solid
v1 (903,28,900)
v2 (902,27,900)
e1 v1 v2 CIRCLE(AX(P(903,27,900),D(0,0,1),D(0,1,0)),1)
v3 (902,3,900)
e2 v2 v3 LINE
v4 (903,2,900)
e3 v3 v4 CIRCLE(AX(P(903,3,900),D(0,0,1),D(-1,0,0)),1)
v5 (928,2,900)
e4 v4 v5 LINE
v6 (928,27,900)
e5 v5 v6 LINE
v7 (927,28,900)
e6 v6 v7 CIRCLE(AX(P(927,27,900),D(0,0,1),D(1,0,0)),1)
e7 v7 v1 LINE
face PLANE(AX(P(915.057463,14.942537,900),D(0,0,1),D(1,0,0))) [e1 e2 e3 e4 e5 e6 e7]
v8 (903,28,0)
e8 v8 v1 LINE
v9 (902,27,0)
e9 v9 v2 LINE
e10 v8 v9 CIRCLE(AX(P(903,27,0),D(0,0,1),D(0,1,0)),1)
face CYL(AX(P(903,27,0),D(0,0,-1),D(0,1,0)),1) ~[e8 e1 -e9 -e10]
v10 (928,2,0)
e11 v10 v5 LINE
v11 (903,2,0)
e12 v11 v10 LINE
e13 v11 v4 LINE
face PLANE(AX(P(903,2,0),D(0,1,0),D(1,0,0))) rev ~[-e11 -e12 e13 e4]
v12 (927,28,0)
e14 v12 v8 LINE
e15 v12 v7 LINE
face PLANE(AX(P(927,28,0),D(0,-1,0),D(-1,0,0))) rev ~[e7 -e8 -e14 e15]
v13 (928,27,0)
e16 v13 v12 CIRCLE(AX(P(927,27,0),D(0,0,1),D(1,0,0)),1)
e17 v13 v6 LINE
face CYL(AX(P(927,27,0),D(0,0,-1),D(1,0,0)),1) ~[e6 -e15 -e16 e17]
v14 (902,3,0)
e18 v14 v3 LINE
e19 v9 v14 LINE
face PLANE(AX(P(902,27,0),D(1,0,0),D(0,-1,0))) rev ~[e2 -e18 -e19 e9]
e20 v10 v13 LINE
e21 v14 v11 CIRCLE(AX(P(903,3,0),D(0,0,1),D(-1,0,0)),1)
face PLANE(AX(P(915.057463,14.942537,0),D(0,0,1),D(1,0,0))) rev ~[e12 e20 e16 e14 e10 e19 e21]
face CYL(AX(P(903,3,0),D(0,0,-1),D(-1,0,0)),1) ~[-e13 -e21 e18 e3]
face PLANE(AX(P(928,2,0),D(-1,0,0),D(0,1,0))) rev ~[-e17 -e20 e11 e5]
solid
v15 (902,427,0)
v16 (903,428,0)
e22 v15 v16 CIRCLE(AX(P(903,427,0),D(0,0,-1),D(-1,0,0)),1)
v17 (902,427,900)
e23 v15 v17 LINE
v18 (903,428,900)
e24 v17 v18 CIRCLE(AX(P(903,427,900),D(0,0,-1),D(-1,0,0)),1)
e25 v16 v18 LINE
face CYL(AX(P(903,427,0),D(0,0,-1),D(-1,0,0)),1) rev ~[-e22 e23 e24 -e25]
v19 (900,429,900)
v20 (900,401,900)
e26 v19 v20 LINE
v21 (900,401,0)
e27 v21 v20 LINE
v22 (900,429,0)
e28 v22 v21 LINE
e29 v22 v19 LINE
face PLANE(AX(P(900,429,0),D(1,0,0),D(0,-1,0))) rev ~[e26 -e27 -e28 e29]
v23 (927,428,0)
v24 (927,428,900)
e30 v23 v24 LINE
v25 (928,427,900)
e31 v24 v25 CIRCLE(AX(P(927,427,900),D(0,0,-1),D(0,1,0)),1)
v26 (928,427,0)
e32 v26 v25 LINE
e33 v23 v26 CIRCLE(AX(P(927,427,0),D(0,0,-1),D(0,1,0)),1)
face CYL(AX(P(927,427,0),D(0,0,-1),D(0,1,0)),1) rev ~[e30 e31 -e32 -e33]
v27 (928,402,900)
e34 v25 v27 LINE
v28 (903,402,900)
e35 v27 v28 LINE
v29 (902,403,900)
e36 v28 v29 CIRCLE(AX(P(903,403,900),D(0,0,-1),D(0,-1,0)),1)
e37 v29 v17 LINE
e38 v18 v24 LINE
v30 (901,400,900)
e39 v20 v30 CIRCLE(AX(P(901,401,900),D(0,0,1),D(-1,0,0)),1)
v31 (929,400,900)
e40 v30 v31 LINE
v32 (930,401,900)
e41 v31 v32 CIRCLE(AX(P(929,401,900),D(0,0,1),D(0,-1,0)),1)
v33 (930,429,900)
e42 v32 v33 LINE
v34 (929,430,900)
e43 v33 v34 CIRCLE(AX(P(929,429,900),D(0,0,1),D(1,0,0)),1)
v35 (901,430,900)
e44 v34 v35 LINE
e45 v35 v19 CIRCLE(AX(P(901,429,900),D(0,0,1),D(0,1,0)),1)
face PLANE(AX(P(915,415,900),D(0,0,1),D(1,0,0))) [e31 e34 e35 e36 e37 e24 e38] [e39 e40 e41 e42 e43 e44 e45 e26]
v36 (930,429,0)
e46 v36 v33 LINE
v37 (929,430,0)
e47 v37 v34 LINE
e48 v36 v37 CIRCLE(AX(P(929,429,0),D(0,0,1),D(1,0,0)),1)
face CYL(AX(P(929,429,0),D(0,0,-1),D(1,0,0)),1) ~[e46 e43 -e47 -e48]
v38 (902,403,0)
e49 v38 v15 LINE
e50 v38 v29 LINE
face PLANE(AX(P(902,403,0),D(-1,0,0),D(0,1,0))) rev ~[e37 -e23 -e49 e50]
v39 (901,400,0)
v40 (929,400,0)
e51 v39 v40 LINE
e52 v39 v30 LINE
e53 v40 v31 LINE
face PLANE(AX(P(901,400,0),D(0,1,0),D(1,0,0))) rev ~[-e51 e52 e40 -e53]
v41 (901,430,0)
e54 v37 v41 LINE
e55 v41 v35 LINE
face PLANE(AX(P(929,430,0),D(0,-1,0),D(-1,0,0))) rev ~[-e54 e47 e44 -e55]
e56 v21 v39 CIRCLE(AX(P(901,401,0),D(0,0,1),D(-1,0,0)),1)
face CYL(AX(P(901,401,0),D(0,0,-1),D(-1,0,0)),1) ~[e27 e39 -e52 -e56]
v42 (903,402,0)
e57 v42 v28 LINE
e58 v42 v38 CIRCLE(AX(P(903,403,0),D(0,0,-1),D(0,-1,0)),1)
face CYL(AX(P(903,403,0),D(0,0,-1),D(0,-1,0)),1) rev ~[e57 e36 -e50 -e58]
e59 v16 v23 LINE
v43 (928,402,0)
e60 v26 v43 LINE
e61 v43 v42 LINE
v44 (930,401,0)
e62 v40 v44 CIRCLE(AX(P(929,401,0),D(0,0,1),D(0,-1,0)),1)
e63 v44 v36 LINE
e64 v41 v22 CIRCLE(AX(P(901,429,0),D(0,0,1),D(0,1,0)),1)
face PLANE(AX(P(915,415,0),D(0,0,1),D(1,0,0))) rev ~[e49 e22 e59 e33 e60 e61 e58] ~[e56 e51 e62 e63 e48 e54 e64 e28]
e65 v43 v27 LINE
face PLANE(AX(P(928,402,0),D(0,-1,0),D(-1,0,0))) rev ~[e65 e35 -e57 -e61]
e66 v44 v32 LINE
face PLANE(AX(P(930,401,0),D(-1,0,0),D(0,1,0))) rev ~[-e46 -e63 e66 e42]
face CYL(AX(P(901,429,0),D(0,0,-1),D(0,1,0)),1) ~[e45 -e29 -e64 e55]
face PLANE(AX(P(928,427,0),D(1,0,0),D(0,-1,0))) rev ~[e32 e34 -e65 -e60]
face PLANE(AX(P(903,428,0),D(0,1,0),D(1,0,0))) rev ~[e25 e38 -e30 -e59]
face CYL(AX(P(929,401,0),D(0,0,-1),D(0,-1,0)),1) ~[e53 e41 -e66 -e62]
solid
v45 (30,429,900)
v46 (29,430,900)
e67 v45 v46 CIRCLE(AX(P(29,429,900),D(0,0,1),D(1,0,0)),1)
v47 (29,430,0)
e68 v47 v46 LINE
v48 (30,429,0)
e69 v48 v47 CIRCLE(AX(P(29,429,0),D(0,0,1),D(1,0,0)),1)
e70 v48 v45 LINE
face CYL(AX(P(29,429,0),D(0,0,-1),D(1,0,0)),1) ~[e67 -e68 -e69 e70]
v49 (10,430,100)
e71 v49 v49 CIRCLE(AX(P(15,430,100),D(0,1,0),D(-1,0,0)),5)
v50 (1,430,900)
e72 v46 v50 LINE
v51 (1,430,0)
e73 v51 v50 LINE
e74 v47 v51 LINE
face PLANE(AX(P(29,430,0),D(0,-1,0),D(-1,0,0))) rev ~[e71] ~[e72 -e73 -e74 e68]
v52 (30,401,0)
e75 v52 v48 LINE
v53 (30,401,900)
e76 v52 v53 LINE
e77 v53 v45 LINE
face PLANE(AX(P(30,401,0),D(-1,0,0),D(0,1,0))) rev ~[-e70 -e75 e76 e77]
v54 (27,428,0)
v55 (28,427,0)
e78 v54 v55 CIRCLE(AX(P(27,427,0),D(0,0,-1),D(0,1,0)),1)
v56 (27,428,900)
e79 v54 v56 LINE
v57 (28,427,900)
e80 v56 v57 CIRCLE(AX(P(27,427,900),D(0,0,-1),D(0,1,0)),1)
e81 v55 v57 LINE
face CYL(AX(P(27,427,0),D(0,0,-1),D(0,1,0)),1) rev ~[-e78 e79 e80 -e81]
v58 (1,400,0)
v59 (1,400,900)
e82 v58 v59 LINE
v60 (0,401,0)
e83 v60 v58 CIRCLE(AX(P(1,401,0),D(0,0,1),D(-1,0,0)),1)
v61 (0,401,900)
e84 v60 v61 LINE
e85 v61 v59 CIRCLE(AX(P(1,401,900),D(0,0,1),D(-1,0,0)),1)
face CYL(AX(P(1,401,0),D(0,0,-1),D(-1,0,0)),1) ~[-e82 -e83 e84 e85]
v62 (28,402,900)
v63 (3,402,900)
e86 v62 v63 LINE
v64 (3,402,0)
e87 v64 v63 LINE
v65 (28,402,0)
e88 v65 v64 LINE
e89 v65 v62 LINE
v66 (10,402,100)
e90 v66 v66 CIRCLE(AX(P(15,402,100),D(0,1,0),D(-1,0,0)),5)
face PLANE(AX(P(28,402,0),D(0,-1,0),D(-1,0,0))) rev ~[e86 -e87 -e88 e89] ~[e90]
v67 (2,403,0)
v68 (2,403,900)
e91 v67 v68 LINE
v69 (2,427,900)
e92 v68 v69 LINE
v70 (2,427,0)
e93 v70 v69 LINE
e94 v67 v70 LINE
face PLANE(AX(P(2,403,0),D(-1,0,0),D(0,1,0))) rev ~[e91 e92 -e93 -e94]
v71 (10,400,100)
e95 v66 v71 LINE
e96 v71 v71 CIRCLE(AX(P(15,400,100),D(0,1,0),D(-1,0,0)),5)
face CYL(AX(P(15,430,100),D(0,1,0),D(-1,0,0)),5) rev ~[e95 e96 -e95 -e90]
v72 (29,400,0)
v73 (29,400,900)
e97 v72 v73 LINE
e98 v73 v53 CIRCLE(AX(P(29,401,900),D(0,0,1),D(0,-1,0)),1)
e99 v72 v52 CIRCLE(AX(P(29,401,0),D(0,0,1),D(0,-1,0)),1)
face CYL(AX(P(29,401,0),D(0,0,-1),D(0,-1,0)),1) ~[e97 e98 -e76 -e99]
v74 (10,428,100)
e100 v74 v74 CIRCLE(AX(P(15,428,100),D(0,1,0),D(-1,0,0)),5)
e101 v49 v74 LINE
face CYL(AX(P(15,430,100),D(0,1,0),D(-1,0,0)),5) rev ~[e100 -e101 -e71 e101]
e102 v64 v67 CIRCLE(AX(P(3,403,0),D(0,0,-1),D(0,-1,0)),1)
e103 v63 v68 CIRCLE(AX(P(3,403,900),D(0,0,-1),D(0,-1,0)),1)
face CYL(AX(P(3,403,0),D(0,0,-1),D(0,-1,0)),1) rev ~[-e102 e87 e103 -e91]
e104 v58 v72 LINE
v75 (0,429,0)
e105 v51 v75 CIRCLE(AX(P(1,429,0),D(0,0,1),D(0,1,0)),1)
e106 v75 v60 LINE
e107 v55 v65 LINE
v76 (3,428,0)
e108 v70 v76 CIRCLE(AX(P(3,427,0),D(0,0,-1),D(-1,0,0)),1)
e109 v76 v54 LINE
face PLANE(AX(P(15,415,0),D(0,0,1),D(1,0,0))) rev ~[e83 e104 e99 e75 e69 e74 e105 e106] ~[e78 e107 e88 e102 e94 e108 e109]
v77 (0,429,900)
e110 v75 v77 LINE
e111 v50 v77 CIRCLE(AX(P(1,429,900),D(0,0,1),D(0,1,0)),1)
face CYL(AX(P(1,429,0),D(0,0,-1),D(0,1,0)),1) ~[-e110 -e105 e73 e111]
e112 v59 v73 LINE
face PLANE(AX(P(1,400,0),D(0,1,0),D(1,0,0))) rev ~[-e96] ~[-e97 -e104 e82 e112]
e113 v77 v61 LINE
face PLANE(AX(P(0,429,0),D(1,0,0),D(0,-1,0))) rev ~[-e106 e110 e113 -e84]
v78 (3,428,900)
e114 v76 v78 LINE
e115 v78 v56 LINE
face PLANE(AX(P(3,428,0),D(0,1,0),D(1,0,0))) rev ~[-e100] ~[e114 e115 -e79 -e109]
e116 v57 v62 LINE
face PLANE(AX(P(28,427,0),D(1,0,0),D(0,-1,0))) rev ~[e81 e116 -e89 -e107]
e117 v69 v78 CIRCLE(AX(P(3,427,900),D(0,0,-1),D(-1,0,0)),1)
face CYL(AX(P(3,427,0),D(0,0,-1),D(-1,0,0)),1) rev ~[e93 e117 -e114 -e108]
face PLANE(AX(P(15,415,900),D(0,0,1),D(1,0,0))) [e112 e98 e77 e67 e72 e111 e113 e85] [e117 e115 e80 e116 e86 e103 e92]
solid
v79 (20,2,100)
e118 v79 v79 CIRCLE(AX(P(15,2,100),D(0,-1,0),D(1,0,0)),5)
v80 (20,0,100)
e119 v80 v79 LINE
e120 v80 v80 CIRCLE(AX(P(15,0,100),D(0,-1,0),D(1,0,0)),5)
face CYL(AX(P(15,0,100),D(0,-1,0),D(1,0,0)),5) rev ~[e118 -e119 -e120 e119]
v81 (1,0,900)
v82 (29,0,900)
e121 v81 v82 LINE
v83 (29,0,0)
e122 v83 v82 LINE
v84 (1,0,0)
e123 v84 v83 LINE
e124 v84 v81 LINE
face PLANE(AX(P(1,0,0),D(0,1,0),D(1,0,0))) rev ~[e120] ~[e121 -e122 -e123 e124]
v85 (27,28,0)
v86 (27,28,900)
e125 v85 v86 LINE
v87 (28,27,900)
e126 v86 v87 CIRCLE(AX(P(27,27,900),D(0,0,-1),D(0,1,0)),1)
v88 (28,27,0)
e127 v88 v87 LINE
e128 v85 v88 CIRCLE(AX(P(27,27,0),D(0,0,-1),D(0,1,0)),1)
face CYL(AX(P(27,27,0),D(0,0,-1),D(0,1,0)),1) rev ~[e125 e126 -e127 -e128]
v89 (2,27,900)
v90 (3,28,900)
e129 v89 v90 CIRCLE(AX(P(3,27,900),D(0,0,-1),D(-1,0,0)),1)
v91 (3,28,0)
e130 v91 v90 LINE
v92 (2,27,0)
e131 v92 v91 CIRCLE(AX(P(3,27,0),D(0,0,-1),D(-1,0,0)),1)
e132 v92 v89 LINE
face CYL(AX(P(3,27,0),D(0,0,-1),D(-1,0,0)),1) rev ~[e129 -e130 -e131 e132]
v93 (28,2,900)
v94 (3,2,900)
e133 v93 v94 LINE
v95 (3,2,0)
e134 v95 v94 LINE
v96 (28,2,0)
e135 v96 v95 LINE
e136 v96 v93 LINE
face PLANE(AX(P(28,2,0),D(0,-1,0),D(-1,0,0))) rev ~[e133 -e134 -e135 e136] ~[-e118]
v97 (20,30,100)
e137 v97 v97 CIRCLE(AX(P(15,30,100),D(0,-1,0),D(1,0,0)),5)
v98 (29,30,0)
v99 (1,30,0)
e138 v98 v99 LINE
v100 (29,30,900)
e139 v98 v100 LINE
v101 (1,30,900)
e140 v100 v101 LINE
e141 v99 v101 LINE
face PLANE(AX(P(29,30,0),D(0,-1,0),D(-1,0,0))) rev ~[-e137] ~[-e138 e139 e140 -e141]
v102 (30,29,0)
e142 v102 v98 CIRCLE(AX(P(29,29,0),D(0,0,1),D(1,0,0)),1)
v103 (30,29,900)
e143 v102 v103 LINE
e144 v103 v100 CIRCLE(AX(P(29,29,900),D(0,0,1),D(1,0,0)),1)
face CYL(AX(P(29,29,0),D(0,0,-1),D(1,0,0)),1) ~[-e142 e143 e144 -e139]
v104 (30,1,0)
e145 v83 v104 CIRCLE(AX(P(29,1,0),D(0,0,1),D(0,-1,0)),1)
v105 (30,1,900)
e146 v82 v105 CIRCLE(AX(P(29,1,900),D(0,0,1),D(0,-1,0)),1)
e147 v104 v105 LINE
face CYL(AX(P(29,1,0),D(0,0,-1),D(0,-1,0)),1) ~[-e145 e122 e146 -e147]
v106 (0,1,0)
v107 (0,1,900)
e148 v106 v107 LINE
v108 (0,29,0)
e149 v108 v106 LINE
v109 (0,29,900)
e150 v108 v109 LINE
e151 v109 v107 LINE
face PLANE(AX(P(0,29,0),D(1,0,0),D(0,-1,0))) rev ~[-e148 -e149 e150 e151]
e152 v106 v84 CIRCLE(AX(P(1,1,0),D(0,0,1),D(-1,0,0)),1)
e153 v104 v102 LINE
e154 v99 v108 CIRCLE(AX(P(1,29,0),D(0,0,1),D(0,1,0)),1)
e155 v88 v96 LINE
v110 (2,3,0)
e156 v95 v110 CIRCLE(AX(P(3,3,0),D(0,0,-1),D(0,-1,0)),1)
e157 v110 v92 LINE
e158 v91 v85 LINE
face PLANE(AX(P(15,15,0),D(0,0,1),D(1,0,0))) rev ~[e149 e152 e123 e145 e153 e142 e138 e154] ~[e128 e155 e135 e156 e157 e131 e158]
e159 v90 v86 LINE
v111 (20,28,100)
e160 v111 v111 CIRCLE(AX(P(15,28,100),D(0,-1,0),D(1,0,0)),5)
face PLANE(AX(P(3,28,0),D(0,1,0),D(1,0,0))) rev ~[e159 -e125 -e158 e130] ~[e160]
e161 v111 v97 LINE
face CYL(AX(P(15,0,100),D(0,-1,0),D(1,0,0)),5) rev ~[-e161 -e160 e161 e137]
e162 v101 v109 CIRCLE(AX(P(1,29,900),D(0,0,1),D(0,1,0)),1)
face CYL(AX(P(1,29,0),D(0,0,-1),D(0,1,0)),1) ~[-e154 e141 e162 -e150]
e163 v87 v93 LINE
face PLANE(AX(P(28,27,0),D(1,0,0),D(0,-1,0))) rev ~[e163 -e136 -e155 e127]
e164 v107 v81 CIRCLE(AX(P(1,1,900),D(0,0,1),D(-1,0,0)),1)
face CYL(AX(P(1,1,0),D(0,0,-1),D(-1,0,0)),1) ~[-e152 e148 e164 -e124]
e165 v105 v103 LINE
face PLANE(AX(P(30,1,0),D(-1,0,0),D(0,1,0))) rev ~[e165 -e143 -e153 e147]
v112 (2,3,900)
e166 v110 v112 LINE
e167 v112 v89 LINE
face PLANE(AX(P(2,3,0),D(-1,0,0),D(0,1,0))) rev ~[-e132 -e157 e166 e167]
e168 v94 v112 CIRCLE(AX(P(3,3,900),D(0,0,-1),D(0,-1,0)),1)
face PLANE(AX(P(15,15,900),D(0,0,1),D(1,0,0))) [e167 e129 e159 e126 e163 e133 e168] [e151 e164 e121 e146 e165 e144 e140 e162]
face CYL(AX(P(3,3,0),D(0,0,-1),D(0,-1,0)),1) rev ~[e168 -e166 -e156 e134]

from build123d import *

# Parameters (mm, degrees)
F2_DEPTH = 900
F3_R     = 5
F4_DEPTH = 30
F5_R     = 5
F6_DEPTH = 30
F7_DEPTH = 25


with BuildPart() as f2:
    # F0 (on Top) → F2 (new body)
    with BuildSketch(Plane.XY):
        with BuildLine():
            ThreePointArc((0, 1), (0.2928932188, 0.2928932188), (1, 0))
            Line((1, 0), (29, 0))
            ThreePointArc((29, 0), (29.7071067812, 0.2928932188), (30, 1))
            Line((30, 1), (30, 29))
            ThreePointArc((30, 29), (29.7071067812, 29.7071067812), (29, 30))
            Line((29, 30), (1, 30))
            ThreePointArc((1, 30), (0.2928932188, 29.7071067812), (0, 29))
            Line((0, 29), (0, 1))
        make_face()
        with BuildLine():
            Line((3, 28), (27, 28))
            ThreePointArc((27, 28), (27.7071067812, 27.7071067812), (28, 27))
            Line((28, 27), (28, 2))
            Line((28, 2), (3, 2))
            ThreePointArc((3, 2), (2.2928932188, 2.2928932188), (2, 3))
            Line((2, 3), (2, 27))
            ThreePointArc((2, 27), (2.2928932188, 27.7071067812), (3, 28))
        make_face(mode=Mode.SUBTRACT)
    extrude(amount=F2_DEPTH)

    # F3 (on face) → F4 (cut)
    with BuildSketch(Plane.XZ):
        with Locations((15, 100)):
            Circle(F3_R)
    extrude(amount=-F4_DEPTH, mode=Mode.SUBTRACT)

    # F0 (on Top) → F7 (cut)
    with BuildSketch(Plane.XY):
        with BuildLine():
            ThreePointArc((28, 27), (27.7071067812, 27.7071067812), (27, 28))
            Line((27, 28), (3, 28))
            ThreePointArc((3, 28), (2.2928932188, 27.7071067812), (2, 27))
            Line((2, 27), (2, 3))
            ThreePointArc((2, 3), (2.2928932188, 2.2928932188), (3, 2))
            Line((3, 2), (28, 2))
            Line((28, 2), (28, 27))
        make_face()
    extrude(amount=-F7_DEPTH, mode=Mode.SUBTRACT)


with BuildPart() as f2b:
    # F0 (on Top) → F2, piece 2 (new body)
    with BuildSketch(Plane.XY):
        with BuildLine():
            ThreePointArc((29, 400), (29.7071067812, 400.2928932188), (30, 401))
            Line((30, 401), (30, 429))
            ThreePointArc((30, 429), (29.7071067812, 429.7071067812), (29, 430))
            Line((29, 430), (1, 430))
            ThreePointArc((1, 430), (0.2928932188, 429.7071067812), (0, 429))
            Line((0, 429), (0, 401))
            ThreePointArc((0, 401), (0.2928932188, 400.2928932188), (1, 400))
            Line((1, 400), (29, 400))
        make_face()
        with BuildLine():
            Line((3, 428), (27, 428))
            ThreePointArc((27, 428), (27.7071067812, 427.7071067812), (28, 427))
            Line((28, 427), (28, 402))
            Line((28, 402), (3, 402))
            ThreePointArc((3, 402), (2.2928932188, 402.2928932188), (2, 403))
            Line((2, 403), (2, 427))
            ThreePointArc((2, 427), (2.2928932188, 427.7071067812), (3, 428))
        make_face(mode=Mode.SUBTRACT)
    extrude(amount=F2_DEPTH)

    # F5 (on face) → F6 (cut)
    with BuildSketch(Plane(origin=(0, 430, 0), x_dir=(-1, 0, 0), z_dir=(0, 1, 0))):
        with Locations((-15, 100)):
            Circle(F5_R)
    extrude(amount=-F6_DEPTH, mode=Mode.SUBTRACT)


with BuildPart() as f2c:
    # F0 (on Top) → F2, piece 3 (new body)
    with BuildSketch(Plane.XY):
        with BuildLine():
            ThreePointArc((928, 27), (927.7071067812, 27.7071067812), (927, 28))
            Line((927, 28), (903, 28))
            ThreePointArc((903, 28), (902.2928932188, 27.7071067812), (902, 27))
            Line((902, 27), (902, 3))
            ThreePointArc((902, 3), (902.2928932188, 2.2928932188), (903, 2))
            Line((903, 2), (928, 2))
            Line((928, 2), (928, 27))
        make_face()
    extrude(amount=F2_DEPTH)


with BuildPart() as f2d:
    # F0 (on Top) → F2, piece 4 (new body)
    with BuildSketch(Plane.XY):
        with BuildLine():
            ThreePointArc((929, 400), (929.7071067812, 400.2928932188), (930, 401))
            Line((930, 401), (930, 429))
            ThreePointArc((930, 429), (929.7071067812, 429.7071067812), (929, 430))
            Line((929, 430), (901, 430))
            ThreePointArc((901, 430), (900.2928932188, 429.7071067812), (900, 429))
            Line((900, 429), (900, 401))
            ThreePointArc((900, 401), (900.2928932188, 400.2928932188), (901, 400))
            Line((901, 400), (929, 400))
        make_face()
        with BuildLine():
            Line((903, 428), (927, 428))
            ThreePointArc((927, 428), (927.7071067812, 427.7071067812), (928, 427))
            Line((928, 427), (928, 402))
            Line((928, 402), (903, 402))
            ThreePointArc((903, 402), (902.2928932188, 402.2928932188), (902, 403))
            Line((902, 403), (902, 427))
            ThreePointArc((902, 427), (902.2928932188, 427.7071067812), (903, 428))
        make_face(mode=Mode.SUBTRACT)
    extrude(amount=F2_DEPTH)


solid = Compound([f2.part, f2b.part, f2c.part, f2d.part])
